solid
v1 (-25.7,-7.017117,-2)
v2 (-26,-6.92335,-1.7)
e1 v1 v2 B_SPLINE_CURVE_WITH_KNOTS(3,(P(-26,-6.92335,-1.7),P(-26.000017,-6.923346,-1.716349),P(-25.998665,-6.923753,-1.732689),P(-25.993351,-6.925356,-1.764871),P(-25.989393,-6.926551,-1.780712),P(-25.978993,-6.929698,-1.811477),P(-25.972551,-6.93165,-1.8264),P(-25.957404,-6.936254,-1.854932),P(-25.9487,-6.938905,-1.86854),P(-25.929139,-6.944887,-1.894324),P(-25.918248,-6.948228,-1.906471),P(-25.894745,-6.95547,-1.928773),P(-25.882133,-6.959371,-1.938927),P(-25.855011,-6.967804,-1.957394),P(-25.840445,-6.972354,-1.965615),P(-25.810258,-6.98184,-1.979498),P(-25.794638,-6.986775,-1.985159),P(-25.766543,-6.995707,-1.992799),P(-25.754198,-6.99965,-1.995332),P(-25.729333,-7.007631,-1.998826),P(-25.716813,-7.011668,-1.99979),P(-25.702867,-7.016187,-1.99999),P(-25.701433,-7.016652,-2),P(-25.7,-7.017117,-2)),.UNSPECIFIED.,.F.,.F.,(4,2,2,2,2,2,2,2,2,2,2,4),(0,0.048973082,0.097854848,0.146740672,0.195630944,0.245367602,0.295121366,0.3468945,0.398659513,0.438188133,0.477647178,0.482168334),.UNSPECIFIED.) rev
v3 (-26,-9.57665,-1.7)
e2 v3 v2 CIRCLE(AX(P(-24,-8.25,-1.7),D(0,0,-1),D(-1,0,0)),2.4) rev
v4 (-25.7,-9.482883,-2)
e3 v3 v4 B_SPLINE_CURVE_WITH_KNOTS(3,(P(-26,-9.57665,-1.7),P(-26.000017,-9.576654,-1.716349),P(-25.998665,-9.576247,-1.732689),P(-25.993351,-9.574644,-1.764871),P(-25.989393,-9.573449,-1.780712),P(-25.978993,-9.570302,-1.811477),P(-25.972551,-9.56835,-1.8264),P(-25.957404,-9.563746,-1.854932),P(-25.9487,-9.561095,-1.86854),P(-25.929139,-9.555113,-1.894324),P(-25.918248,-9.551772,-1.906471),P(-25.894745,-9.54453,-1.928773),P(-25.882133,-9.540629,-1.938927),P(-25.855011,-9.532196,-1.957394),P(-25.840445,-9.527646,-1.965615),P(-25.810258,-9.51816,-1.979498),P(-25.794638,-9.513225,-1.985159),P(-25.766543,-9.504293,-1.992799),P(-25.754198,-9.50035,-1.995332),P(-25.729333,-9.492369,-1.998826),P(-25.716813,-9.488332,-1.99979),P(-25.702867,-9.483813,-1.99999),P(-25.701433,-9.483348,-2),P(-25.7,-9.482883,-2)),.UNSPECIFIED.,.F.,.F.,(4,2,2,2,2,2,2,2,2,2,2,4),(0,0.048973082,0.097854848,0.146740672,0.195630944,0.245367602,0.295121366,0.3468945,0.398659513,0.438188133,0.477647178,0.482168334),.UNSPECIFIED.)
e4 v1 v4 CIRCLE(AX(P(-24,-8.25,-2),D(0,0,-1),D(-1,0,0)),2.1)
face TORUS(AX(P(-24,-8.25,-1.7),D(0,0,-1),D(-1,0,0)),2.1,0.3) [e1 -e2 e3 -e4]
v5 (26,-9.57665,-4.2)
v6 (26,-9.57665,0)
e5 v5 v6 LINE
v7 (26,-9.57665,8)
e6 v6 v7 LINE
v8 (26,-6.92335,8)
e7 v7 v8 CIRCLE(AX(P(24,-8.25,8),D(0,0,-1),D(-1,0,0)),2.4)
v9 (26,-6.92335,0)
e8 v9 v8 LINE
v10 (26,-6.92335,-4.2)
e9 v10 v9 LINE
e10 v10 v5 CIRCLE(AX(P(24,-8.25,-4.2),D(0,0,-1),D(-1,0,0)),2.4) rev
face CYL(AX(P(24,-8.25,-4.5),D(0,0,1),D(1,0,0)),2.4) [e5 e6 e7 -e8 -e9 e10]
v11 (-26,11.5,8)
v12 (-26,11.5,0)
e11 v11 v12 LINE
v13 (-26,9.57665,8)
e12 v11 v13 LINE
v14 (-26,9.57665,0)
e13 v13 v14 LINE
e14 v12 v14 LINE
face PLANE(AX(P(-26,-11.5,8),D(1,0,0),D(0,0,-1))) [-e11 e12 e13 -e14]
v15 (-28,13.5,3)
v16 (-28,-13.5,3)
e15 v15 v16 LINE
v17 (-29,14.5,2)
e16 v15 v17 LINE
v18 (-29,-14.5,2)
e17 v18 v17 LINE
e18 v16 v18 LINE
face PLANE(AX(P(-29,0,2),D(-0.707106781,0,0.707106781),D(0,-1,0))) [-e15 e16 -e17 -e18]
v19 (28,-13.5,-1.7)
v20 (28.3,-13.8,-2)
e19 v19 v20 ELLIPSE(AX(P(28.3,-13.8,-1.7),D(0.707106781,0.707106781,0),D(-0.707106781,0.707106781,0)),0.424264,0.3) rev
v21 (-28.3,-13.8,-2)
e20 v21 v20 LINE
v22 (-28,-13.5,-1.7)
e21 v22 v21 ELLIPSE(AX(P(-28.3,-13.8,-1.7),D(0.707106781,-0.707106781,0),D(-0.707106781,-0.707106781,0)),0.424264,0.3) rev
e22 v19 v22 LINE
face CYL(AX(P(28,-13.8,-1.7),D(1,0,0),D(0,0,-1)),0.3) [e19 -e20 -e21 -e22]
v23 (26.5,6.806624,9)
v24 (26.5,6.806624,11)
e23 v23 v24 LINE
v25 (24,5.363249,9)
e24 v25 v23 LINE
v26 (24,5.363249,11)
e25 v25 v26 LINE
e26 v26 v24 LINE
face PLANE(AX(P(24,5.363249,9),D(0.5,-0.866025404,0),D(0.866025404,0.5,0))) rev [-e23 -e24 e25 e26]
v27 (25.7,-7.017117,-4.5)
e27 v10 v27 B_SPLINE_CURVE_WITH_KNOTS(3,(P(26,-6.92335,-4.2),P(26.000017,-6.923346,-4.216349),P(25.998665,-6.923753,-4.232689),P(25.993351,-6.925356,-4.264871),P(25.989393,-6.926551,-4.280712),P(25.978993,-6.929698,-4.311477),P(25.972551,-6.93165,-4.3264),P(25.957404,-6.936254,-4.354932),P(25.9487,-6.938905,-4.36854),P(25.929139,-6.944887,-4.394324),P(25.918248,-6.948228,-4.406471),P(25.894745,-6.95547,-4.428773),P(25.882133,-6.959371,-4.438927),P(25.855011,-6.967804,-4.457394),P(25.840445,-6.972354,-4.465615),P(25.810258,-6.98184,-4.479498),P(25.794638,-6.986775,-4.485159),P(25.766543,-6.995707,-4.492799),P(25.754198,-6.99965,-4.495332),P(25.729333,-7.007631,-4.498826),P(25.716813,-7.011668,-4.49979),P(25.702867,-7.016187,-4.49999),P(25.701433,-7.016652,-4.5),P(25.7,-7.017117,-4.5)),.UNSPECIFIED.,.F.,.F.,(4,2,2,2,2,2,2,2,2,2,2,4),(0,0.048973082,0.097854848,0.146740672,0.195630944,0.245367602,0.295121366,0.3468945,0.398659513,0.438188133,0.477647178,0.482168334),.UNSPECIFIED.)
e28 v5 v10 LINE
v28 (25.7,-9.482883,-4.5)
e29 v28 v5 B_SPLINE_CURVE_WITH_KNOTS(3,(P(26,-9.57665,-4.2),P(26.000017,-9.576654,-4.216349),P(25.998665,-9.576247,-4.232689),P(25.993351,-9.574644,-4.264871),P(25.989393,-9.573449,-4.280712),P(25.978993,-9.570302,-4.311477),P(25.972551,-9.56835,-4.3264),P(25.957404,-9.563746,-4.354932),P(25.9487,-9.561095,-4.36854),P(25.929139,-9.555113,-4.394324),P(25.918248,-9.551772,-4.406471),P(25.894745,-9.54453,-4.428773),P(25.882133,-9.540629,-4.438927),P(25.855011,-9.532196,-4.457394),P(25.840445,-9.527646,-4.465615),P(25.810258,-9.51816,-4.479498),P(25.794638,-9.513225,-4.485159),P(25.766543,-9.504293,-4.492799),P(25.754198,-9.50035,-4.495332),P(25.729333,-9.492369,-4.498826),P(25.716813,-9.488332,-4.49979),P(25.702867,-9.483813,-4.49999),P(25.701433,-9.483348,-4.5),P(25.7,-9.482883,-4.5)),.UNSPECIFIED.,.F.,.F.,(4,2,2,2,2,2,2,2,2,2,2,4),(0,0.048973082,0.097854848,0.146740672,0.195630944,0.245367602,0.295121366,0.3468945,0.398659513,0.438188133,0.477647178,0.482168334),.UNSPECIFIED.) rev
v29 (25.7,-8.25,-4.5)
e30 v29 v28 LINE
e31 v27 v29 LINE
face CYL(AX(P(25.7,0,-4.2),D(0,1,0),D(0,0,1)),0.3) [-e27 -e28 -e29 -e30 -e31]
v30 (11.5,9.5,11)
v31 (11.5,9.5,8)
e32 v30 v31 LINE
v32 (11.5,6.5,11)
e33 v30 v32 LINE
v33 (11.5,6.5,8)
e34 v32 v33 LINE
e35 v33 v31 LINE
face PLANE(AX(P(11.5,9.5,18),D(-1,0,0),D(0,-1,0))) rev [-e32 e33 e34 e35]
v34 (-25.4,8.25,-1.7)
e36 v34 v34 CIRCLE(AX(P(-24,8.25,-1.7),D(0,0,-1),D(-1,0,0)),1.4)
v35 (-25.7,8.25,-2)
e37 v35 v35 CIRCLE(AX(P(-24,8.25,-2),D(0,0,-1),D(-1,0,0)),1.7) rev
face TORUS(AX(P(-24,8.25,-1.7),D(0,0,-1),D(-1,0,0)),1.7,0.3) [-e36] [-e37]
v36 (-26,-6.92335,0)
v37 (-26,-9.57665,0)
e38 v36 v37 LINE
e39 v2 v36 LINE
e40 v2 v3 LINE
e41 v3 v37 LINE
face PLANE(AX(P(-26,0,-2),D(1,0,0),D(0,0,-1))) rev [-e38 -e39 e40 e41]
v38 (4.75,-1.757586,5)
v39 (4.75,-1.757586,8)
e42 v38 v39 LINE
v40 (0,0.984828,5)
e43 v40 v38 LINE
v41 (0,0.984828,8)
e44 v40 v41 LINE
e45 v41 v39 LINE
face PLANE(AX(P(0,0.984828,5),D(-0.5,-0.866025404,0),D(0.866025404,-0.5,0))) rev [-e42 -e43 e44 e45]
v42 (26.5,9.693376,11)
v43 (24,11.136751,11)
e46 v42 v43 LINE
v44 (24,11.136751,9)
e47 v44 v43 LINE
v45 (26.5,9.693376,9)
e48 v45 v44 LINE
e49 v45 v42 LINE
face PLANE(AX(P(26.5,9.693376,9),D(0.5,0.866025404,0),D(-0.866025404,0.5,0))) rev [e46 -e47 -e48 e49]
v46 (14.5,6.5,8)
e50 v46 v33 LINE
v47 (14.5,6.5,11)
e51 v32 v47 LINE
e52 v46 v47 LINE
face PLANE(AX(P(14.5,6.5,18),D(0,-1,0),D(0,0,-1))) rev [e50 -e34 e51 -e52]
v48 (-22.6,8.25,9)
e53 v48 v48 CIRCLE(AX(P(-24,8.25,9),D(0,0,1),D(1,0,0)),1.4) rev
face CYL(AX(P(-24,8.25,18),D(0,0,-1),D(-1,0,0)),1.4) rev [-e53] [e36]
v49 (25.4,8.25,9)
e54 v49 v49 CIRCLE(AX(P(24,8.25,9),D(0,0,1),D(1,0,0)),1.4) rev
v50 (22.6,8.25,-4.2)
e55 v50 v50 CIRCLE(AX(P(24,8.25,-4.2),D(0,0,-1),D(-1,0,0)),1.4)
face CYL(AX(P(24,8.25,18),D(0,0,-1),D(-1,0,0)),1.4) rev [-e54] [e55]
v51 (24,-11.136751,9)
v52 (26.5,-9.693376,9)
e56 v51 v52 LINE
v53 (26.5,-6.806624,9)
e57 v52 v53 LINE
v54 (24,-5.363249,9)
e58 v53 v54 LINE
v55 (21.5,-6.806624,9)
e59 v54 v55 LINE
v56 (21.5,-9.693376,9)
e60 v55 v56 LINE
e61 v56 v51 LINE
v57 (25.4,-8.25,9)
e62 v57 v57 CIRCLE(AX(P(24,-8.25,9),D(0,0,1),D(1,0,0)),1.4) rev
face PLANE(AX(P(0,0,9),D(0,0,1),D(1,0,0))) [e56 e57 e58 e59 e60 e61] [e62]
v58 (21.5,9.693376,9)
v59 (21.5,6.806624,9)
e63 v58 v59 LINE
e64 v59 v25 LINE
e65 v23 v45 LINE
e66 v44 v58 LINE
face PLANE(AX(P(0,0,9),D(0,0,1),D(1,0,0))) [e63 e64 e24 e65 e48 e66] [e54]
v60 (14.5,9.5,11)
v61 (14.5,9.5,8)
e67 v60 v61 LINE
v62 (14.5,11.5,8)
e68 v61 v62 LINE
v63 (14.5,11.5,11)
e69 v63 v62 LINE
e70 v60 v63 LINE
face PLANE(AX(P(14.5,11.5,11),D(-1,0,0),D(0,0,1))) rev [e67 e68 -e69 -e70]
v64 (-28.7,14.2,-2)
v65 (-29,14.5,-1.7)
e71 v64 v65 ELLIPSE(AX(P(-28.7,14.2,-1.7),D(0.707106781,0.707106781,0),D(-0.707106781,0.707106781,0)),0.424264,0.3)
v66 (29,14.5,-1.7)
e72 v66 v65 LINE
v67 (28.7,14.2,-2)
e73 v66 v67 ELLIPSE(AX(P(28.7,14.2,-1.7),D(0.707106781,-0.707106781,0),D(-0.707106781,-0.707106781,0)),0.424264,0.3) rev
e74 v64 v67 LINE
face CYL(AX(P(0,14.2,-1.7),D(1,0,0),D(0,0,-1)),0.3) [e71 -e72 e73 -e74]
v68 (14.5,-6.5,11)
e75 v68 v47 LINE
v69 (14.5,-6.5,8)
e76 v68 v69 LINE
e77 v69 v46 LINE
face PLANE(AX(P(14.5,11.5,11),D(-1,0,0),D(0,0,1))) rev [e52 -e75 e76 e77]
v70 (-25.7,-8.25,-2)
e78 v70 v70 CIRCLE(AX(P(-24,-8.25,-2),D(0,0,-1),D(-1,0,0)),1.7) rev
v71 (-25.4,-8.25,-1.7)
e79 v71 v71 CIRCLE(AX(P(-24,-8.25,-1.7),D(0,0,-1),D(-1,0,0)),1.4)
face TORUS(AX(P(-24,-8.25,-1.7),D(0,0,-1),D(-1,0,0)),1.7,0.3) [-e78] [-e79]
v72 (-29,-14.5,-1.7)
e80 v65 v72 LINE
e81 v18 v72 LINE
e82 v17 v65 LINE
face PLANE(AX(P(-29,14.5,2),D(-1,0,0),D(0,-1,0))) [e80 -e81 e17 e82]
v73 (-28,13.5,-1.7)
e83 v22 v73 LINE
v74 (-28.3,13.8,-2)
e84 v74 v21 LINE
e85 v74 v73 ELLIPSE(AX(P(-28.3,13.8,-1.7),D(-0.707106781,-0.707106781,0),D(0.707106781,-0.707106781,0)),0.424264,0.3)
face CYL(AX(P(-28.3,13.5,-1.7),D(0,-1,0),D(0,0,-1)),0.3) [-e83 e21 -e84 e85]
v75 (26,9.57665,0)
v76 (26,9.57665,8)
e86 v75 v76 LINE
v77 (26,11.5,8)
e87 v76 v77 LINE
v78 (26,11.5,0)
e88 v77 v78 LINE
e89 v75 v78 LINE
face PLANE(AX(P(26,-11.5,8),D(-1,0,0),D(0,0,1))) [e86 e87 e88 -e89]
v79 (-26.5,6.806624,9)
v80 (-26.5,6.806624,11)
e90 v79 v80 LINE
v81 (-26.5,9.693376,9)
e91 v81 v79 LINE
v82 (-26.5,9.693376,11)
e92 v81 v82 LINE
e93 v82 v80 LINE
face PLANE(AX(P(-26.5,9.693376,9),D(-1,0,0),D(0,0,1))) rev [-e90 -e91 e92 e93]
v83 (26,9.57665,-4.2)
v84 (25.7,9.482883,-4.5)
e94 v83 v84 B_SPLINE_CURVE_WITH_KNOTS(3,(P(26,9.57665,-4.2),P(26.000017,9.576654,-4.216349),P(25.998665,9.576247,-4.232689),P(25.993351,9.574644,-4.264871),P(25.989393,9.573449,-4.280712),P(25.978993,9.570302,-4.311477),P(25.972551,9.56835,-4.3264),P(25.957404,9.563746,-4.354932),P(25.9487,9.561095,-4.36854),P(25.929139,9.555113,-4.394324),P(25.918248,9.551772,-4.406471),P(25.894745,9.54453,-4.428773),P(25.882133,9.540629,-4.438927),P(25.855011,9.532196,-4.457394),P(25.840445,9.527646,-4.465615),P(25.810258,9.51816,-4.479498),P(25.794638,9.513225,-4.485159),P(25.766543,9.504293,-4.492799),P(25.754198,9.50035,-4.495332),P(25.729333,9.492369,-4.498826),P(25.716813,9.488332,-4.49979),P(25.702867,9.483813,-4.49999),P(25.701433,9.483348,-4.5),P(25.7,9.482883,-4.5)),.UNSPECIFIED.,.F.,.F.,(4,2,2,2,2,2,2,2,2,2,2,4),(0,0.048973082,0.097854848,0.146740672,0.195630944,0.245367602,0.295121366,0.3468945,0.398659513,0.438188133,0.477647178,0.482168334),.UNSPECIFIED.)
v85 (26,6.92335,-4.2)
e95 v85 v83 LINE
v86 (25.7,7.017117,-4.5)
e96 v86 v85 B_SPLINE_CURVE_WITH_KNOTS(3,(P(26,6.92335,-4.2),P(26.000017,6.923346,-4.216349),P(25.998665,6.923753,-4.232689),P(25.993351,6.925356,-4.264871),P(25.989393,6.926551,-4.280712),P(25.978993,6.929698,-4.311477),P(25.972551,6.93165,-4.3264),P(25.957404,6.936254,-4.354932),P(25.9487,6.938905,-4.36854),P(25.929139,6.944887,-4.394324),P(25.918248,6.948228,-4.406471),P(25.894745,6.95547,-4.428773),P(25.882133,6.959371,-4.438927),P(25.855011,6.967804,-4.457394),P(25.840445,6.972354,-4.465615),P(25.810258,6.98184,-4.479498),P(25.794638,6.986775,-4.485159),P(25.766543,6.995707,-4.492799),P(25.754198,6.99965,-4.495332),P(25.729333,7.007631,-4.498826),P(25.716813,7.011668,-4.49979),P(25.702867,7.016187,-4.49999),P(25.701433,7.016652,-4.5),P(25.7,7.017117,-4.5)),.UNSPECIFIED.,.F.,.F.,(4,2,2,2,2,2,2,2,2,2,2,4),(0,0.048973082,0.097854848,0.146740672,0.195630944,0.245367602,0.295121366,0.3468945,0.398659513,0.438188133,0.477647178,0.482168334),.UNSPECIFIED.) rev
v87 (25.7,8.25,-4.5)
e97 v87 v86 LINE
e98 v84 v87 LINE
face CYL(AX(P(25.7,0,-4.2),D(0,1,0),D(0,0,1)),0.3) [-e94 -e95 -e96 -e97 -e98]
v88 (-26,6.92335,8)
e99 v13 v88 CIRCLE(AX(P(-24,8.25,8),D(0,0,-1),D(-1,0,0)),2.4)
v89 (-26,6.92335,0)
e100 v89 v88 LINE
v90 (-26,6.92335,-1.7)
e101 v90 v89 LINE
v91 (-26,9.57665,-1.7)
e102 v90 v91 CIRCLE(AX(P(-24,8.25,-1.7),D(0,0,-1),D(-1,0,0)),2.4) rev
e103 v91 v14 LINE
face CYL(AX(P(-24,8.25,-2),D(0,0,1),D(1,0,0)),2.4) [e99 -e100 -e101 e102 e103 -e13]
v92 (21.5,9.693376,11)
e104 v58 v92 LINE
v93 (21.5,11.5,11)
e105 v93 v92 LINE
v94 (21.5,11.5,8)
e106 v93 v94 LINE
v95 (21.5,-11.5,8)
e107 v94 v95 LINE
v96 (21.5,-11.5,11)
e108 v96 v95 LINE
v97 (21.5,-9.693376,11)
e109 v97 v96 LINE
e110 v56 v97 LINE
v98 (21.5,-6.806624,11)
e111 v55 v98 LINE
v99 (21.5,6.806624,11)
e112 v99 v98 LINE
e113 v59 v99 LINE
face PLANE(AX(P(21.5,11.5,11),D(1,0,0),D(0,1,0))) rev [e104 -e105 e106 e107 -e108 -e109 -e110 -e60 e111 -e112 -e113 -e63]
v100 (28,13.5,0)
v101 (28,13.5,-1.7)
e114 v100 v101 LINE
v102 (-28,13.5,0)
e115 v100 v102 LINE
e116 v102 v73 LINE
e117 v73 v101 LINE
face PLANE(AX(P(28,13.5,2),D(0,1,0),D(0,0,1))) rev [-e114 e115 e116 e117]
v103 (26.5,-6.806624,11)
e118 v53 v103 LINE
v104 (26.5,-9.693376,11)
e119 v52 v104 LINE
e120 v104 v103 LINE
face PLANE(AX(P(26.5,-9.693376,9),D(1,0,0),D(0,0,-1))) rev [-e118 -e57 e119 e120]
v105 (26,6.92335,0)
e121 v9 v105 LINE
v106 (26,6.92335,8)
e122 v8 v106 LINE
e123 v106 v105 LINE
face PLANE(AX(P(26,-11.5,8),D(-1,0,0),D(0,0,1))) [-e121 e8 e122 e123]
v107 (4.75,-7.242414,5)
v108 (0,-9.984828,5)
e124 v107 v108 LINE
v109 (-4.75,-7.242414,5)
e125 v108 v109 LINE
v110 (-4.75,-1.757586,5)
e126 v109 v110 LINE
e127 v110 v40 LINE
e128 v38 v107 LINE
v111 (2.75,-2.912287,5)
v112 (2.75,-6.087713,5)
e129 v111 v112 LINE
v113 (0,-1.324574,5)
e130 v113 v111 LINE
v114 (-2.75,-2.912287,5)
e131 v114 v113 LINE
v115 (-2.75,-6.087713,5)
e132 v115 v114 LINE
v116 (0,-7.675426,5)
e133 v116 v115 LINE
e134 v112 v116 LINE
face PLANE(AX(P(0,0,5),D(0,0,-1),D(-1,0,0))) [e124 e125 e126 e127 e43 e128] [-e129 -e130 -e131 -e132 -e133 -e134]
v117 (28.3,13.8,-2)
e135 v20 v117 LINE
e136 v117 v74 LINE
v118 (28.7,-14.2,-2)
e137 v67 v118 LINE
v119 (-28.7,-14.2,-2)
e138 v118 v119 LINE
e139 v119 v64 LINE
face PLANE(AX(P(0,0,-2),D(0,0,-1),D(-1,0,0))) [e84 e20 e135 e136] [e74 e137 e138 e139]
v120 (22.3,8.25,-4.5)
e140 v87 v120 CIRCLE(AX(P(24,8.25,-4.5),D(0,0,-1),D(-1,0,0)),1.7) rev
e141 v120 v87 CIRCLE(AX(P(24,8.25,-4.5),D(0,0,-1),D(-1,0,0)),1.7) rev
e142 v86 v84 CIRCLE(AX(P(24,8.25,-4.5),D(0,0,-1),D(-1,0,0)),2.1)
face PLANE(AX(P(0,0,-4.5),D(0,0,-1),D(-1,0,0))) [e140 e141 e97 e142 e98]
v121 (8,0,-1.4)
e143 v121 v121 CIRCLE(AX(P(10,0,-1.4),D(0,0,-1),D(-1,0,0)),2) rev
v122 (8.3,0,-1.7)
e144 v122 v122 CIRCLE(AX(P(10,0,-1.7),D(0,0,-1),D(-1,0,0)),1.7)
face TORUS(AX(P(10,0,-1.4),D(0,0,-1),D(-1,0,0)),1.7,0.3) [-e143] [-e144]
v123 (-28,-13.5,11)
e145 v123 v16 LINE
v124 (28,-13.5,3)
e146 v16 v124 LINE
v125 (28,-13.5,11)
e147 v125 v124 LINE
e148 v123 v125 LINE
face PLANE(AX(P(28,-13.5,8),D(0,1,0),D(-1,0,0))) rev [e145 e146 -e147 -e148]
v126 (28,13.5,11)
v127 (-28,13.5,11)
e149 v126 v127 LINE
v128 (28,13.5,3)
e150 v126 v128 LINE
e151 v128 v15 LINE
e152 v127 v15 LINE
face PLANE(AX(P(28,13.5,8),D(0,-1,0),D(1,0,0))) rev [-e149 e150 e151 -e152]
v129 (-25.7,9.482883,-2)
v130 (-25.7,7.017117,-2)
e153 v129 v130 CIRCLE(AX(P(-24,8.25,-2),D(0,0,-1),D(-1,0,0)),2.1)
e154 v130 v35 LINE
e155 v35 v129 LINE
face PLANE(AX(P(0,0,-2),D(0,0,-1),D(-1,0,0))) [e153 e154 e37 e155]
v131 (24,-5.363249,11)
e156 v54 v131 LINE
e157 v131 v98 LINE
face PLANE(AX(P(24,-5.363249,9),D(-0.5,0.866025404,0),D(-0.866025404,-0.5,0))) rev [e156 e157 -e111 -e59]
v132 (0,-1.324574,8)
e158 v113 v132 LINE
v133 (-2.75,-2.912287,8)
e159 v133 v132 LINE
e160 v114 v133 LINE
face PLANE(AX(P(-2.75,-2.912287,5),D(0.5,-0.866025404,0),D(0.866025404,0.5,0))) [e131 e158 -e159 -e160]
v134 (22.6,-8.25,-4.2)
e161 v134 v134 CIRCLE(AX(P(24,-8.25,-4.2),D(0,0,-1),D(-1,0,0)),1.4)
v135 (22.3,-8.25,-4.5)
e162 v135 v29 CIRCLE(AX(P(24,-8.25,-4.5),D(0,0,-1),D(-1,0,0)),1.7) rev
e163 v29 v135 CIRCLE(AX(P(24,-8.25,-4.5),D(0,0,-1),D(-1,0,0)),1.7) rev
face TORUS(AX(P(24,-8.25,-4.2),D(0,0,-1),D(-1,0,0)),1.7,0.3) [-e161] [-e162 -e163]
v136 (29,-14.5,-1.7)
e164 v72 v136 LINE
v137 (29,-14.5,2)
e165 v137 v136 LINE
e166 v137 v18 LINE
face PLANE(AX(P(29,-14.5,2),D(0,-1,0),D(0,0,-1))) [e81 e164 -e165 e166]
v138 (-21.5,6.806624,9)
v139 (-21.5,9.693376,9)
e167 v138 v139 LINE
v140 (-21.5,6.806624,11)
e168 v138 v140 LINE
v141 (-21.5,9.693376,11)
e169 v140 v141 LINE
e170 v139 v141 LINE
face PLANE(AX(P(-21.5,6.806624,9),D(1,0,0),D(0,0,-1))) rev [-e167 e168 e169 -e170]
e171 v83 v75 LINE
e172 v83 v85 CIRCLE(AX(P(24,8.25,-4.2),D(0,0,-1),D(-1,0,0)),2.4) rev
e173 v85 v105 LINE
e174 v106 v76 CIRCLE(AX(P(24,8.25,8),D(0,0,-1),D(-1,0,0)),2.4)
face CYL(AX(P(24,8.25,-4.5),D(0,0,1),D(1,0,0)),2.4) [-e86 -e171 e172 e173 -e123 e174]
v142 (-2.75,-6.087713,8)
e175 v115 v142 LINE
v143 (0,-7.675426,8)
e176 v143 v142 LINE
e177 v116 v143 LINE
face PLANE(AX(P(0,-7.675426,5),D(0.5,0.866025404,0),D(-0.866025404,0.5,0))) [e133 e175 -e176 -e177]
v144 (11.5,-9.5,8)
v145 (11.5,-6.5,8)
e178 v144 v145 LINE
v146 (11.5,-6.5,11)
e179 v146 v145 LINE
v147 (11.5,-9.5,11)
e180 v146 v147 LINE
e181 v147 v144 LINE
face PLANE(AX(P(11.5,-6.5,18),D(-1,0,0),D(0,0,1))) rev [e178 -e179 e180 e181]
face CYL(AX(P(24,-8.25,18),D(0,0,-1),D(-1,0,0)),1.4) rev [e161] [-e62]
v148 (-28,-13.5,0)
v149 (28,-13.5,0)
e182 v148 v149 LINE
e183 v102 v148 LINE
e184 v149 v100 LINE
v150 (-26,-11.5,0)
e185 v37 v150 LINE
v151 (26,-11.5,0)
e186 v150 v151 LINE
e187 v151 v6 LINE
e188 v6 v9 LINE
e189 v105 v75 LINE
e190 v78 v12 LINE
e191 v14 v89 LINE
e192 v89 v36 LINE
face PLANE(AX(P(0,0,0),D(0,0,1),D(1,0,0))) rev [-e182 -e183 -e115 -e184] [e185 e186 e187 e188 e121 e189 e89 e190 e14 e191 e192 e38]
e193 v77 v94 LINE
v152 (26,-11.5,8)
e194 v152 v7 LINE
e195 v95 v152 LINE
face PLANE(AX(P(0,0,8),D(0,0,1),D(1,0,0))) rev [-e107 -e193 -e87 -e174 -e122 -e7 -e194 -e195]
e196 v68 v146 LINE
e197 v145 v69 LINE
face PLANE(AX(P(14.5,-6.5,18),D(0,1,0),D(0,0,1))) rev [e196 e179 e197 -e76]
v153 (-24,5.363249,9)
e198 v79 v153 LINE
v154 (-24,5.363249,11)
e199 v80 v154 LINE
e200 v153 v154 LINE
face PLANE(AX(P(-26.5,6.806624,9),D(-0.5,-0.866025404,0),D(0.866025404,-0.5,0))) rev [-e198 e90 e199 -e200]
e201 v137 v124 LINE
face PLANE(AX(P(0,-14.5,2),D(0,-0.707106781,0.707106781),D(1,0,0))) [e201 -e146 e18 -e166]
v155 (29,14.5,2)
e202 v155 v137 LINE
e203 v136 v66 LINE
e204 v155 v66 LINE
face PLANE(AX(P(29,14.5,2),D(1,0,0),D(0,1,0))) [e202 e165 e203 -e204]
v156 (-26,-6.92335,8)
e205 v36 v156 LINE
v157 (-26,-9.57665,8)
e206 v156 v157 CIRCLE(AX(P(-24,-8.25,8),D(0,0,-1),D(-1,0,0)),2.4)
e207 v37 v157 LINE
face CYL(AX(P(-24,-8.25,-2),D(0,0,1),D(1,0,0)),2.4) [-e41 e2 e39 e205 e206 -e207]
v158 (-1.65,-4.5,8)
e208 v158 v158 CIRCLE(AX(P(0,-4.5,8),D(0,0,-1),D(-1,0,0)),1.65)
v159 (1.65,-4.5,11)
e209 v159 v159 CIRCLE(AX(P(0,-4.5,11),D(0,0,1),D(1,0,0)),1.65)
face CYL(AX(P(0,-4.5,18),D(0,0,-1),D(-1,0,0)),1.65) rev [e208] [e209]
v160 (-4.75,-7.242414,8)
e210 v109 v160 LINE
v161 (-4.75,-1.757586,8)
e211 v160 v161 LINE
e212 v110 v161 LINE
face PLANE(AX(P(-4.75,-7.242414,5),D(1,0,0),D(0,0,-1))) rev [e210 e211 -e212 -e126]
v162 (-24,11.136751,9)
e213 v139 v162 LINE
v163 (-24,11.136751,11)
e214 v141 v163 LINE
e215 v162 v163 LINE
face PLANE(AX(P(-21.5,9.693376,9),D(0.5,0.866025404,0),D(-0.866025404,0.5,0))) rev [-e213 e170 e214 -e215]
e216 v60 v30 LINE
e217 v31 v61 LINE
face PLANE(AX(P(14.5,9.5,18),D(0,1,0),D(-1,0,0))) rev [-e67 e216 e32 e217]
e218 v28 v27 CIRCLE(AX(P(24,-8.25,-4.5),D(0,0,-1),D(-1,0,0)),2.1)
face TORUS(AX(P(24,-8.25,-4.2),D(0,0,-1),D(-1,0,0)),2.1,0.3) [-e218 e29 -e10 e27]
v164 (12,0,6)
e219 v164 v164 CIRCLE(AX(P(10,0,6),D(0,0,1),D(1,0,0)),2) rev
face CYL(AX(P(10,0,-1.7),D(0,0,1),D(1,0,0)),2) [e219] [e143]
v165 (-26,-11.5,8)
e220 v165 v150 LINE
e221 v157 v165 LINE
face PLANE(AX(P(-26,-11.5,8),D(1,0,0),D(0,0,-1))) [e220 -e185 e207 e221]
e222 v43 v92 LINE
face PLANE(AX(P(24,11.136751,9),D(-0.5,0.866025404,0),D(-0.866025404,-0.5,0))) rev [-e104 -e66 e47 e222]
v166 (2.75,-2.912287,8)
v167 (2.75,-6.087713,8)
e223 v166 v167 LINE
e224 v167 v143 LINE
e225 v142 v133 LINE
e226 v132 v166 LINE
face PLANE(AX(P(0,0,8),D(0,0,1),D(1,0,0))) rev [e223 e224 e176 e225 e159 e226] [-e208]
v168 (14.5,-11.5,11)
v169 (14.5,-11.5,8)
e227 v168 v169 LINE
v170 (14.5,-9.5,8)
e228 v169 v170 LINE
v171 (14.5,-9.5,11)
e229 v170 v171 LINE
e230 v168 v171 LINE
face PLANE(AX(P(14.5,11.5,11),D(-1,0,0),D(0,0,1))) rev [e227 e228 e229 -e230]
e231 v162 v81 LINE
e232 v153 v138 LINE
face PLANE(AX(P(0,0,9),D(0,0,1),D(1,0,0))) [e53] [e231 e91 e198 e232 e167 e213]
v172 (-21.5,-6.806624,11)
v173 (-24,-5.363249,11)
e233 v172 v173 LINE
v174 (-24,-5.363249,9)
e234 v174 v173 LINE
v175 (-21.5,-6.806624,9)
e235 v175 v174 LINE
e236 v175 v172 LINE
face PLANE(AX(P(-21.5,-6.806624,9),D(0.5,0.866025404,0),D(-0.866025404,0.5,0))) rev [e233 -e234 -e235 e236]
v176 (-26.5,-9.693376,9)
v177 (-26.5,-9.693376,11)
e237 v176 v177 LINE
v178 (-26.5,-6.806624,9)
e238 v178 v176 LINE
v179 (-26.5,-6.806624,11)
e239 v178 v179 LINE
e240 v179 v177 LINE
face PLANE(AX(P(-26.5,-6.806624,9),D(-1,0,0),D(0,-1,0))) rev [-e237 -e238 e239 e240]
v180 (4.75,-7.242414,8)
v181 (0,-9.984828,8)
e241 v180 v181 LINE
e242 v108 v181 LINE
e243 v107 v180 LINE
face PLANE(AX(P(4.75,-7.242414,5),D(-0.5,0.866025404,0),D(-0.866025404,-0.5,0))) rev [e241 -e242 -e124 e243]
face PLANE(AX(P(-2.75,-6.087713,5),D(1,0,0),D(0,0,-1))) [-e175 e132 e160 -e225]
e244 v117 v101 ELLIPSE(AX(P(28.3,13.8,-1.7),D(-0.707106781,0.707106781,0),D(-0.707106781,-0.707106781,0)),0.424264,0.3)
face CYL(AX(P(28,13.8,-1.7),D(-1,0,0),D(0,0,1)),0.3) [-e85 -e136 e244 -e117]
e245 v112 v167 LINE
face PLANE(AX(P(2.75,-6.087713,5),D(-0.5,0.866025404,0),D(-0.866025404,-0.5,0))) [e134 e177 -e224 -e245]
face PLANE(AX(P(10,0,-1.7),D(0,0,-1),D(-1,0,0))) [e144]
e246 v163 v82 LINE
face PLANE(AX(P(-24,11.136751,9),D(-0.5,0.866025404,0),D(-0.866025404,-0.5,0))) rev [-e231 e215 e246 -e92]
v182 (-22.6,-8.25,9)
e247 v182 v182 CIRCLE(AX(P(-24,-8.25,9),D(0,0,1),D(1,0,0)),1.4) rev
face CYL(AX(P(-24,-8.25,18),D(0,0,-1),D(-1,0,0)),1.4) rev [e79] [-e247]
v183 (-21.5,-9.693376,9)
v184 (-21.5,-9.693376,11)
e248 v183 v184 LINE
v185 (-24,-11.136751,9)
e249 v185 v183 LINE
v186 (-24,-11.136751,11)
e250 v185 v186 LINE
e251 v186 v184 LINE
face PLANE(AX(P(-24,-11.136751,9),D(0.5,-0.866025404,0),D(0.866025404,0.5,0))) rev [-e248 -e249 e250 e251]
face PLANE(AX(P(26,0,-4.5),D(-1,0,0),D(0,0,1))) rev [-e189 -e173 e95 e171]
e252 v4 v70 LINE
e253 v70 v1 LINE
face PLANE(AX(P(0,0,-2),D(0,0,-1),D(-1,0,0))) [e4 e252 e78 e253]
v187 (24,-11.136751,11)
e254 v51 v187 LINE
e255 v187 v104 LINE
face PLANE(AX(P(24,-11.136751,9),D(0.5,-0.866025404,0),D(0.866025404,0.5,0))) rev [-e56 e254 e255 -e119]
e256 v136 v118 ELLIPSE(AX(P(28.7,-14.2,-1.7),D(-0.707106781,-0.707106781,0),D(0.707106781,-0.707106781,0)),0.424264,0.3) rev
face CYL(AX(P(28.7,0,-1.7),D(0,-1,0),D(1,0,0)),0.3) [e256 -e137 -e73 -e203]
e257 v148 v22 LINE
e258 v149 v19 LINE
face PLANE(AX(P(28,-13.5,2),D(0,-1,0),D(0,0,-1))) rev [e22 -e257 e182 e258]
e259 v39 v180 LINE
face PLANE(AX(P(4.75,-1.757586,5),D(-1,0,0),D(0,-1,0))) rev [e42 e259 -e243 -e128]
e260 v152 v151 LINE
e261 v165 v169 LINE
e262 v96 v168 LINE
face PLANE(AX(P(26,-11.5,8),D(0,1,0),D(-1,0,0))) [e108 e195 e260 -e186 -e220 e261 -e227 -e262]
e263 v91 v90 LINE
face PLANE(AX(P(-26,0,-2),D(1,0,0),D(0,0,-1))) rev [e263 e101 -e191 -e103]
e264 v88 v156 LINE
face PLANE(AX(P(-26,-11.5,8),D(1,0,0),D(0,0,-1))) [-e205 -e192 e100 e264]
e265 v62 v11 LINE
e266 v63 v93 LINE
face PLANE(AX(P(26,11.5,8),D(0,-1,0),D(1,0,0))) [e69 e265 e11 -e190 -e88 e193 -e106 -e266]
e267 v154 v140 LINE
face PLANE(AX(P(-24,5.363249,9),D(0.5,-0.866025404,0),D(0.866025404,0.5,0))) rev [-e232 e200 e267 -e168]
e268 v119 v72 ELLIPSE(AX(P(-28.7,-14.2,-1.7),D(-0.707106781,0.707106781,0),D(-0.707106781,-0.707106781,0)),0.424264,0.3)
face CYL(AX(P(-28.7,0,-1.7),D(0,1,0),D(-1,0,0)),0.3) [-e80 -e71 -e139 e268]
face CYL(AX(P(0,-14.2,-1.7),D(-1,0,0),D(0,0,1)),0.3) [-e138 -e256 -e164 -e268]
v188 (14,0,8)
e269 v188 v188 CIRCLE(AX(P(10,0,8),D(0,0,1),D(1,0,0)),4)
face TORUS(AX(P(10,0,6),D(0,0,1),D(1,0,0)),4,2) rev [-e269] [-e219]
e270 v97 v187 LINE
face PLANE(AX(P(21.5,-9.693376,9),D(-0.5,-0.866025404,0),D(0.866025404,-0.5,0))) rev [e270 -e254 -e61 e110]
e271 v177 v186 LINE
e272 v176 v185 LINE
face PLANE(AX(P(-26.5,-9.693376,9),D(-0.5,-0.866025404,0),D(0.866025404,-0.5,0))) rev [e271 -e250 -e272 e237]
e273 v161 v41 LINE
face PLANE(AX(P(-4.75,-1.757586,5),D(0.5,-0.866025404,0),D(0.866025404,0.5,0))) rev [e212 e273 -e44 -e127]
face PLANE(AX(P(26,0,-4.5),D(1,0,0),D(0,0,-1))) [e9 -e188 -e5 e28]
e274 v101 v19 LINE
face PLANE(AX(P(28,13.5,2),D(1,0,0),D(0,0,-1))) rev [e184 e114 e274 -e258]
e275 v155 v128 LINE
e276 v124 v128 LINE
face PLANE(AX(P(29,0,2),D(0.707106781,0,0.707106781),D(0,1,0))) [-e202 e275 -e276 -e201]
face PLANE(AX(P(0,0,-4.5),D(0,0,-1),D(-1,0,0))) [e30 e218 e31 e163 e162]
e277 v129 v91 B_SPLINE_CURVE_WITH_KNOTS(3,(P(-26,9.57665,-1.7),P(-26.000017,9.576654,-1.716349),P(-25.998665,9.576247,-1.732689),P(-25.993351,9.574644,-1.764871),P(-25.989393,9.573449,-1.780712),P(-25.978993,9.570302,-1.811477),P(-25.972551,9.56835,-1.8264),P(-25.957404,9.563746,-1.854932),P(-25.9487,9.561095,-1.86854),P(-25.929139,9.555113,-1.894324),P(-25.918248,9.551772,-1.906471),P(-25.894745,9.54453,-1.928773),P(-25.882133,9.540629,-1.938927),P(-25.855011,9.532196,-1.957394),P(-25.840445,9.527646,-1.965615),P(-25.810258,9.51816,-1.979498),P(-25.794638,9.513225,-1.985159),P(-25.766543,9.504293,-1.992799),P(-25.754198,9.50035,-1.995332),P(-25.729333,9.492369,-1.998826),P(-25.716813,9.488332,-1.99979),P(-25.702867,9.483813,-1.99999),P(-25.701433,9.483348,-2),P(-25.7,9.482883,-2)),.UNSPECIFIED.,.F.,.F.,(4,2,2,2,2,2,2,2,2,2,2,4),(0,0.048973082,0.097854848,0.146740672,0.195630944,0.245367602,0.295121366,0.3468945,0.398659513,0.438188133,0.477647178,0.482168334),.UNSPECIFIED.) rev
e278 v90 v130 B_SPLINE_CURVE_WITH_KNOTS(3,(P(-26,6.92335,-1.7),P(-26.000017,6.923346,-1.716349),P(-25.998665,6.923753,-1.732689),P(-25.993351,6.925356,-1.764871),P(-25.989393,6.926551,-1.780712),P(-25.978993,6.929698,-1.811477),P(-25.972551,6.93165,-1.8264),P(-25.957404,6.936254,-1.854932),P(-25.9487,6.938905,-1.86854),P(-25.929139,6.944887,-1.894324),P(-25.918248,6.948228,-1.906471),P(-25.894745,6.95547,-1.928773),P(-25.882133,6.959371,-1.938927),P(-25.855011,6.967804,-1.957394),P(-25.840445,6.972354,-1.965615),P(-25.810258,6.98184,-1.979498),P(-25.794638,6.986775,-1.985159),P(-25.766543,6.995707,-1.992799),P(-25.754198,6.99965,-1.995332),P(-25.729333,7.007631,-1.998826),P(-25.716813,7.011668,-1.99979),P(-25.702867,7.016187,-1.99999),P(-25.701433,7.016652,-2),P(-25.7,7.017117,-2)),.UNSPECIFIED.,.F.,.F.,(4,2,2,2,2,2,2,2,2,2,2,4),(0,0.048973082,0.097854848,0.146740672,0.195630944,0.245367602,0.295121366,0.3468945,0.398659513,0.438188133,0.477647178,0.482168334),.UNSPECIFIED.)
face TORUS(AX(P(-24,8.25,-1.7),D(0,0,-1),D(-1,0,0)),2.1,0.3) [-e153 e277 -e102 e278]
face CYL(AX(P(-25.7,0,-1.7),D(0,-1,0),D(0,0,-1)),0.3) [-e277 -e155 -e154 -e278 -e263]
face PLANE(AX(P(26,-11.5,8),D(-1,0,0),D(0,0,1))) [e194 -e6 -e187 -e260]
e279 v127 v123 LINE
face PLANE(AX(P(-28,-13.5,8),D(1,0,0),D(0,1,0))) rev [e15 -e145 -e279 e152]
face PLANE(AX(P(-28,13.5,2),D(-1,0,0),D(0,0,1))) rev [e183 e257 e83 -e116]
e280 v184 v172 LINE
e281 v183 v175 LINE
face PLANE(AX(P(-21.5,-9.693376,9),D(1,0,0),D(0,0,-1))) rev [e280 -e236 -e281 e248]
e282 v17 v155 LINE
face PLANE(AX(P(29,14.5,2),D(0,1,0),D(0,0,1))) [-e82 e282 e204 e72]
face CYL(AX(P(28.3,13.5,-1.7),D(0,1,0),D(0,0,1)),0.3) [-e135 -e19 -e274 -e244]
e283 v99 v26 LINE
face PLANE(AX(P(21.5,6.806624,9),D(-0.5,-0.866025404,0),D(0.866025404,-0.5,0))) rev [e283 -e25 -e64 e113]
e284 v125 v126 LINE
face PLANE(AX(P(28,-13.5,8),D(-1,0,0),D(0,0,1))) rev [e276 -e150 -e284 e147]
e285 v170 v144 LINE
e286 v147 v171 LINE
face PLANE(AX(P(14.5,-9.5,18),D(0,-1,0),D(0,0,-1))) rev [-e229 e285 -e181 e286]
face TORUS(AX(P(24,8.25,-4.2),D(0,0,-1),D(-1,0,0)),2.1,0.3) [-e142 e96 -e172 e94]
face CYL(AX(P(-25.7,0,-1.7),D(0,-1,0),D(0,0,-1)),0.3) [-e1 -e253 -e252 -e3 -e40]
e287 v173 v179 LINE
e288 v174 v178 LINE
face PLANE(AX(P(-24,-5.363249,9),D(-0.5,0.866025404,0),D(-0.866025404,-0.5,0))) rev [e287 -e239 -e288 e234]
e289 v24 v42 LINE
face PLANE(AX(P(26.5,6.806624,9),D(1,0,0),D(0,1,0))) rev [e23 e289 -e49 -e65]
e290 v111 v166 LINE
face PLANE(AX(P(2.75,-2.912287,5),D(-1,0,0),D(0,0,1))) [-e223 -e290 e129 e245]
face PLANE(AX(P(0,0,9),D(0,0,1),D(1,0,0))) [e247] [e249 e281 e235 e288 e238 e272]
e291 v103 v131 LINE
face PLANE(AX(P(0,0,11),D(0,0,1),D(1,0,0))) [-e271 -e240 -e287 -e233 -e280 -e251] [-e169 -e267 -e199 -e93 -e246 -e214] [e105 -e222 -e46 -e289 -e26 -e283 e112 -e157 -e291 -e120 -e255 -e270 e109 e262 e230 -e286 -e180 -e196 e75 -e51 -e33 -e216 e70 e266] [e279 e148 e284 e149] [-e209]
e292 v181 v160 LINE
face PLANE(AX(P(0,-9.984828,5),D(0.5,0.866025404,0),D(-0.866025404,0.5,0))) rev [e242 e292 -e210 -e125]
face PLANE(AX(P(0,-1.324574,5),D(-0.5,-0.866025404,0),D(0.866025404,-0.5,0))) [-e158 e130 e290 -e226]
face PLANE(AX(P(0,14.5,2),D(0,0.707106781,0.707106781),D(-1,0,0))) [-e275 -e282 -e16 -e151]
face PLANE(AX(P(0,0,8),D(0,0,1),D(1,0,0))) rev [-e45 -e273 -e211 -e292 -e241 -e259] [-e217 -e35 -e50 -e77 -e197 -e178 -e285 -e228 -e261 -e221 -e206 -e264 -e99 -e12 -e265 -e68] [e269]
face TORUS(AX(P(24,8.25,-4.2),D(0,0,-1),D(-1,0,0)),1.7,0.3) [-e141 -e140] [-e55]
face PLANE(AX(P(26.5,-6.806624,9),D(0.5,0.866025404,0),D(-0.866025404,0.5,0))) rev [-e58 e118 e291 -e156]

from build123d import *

# Parameters (mm, degrees)
BOSS_EXTRUDE1_DEPTH      = 8
SKETCH2_W                = 55.999999999999986
SKETCH2_H                = 27.00000000000001
BOSS_EXTRUDE2_DEPTH      = 3
CUT_EXTRUDE1_DEPTH       = 3
SKETCH5_R                = 1.9999999999999996
BOSS_EXTRUDE3_DEPTH      = 9.7
FILLET1_R                = 2
SKETCH6_R                = 1.3999999999999992
CUT_EXTRUDE2_DEPTH       = 10
CUT_EXTRUDE3_DEPTH       = 2
SKETCH11_R               = 1.6500000000000004
SKETCH11_W               = 3
SKETCH11_H               = 2.9999999999999973
CUT_EXTRUDE4_DEPTH       = 10
BOSS_EXTRUDE5_START      = 10
SKETCH10_R               = 1.3999999999999992
BOSS_EXTRUDE5_DEPTH      = 10
BOSS_EXTRUDE6_START      = 12.5
SKETCH10_5_R             = 1.3999999999999992
BOSS_EXTRUDE6_DEPTH      = 12.5
BOSS_EXTRUDE7_DEPTH      = 2
BOSS_EXTRUDE7_DEPTH_BACK = 2
SKETCH12_W               = 55.999999999999986
SKETCH12_H               = 27.000000000000014
BOSS_EXTRUDE8_DEPTH      = 3
FILLET2_R                = 0.3
FILLET3_R                = 0.3
CHAMFER1_SIZE            = 1


with BuildPart() as part:
    # Sketch1 → Boss-Extrude1 (new body)
    with BuildSketch(Plane.XY):
        Polygon((27.999999999999982, -13.499999999999995), (-28.000000000000004, -13.500000000000002), (-27.999999999999996, 13.500000000000005), (27.999999999999982, 13.500000000000012), align=None)
        Polygon((25.999999999999996, -11.499999999999993), (-26.000000000000004, -11.500000000000002), (-26.000000000000004, 11.499999999999998), (25.999999999999996, 11.500000000000005), align=None, mode=Mode.SUBTRACT)
    extrude(amount=BOSS_EXTRUDE1_DEPTH)

    # Sketch2 → Boss-Extrude2 (add)
    with BuildSketch(Plane.XY.offset(8)):
        Rectangle(SKETCH2_W, SKETCH2_H)
    extrude(amount=BOSS_EXTRUDE2_DEPTH)

    # Sketch4 → Cut-Extrude1 (cut)
    with BuildSketch(Plane(origin=(0, 0, 8), x_dir=(-1, 0, 0), z_dir=(0, 0, -1))):
        Polygon((-21.499999999999993, 11.500000000000005), (-14.499999999999993, 11.500000000000005), (-14.499999999999993, -11.500000000000002), (-21.49999999999999, -11.500000000000002), align=None)
    extrude(amount=-CUT_EXTRUDE1_DEPTH, mode=Mode.SUBTRACT)

    # Sketch5 → Boss-Extrude3 (add)
    with BuildSketch(Plane(origin=(0, 0, 8), x_dir=(-1, 0, 0), z_dir=(0, 0, -1))):
        with Locations(Location((-10, 0, 0), (0, 0, 180))):
            Circle(SKETCH5_R)
    extrude(amount=BOSS_EXTRUDE3_DEPTH)

    # Fillet1
    fillet1_edges = [part.edges().sort_by_distance(p)[0] for p in [
        (8, -4.9e-16, 8),
    ]]
    fillet(fillet1_edges, radius=FILLET1_R)

    # Sketch6 → Cut-Extrude2 (cut)
    with BuildSketch(Plane(origin=(0, 0, 8), x_dir=(-1, 0, 0), z_dir=(0, 0, -1))):
        with Locations((24, 8.25)):
            Circle(SKETCH6_R)
        with Locations((24, -8.25)):
            Circle(SKETCH6_R)
        with Locations((-23.999999999999986, 8.25)):
            Circle(SKETCH6_R)
        with Locations((-23.999999999999986, -8.25)):
            Circle(SKETCH6_R)
    extrude(amount=-CUT_EXTRUDE2_DEPTH, mode=Mode.SUBTRACT)

    # Sketch8 → Cut-Extrude3 (cut)
    with BuildSketch(Plane.XY.offset(11)):
        Polygon((-26.5, 9.693375672974062), (-26.5, 6.806624327025934), (-24.000000000000004, 5.363248654051871), (-21.500000000000004, 6.806624327025935), (-21.500000000000004, 9.693375672974065), (-23.999999999999996, 11.136751345948126), align=None)
        Polygon((-24, -5.363248654051871), (-26.500000000000004, -6.806624327025933), (-26.5, -9.693375672974067), (-24.000000000000007, -11.136751345948127), (-21.5, -9.693375672974062), (-21.5, -6.806624327025935), align=None)
        Polygon((23.999999999999982, 11.136751345948133), (21.49999999999998, 9.693375672974065), (21.49999999999998, 6.8066243270259355), (23.999999999999982, 5.363248654051871), (26.49999999999999, 6.806624327025936), (26.499999999999986, 9.693375672974069), align=None)
        Polygon((23.999999999999986, -5.363248654051867), (21.499999999999982, -6.806624327025933), (21.499999999999986, -9.693375672974069), (23.999999999999982, -11.136751345948134), (26.49999999999999, -9.693375672974067), (26.49999999999999, -6.806624327025933), align=None)
    extrude(amount=-CUT_EXTRUDE3_DEPTH, mode=Mode.SUBTRACT)

    # Sketch11 → Cut-Extrude4 (cut)
    with BuildSketch(Plane(origin=(0, 0, 8), x_dir=(-1, 0, 0), z_dir=(0, 0, -1))):
        with Locations((0, -4.500000000000003)):
            Circle(SKETCH11_R)
        Polygon((-14.499999999999995, 9.500000000000004), (-11.5, 9.500000000000005), (-11.499999999999996, 6.500000000000007), (-14.499999999999995, 6.500000000000007), align=None)
        with Locations((-12.999999999999996, -8.000000000000004)):
            Rectangle(SKETCH11_W, SKETCH11_H)
    extrude(amount=-CUT_EXTRUDE4_DEPTH, mode=Mode.SUBTRACT)

    # Sketch10 → Boss-Extrude5 (add)
    # profile 1 of 2: a face of its own
    with BuildSketch(Plane(origin=(0, 0, 8), x_dir=(-1, 0, 0), z_dir=(0, 0, -1)).offset(BOSS_EXTRUDE5_START)):
        with BuildLine():
            Line((26.000000000000004, 6.923350083857869), (26.000000000000004, 9.576649916142129))
            ThreePointArc((26.000000000000018, 9.576649916142133), (21.599999999999998, 8.25), (26.000000000000018, 6.923350083857866))
        make_face()
        with Locations((24, 8.25)):
            Circle(SKETCH10_R, mode=Mode.SUBTRACT)
    # profile 2 of 2: a face of its own
    with BuildSketch(Plane(origin=(0, 0, 8), x_dir=(-1, 0, 0), z_dir=(0, 0, -1)).offset(BOSS_EXTRUDE5_START)):
        with BuildLine():
            ThreePointArc((26.000000000000018, -6.923350083857867), (21.599999999999998, -8.249999999999998), (26.000000000000018, -9.576649916142136))
            Line((26.000000000000004, -9.57664991614213), (26.000000000000004, -6.92335008385787))
        make_face()
        with Locations((24, -8.25)):
            Circle(SKETCH10_R, mode=Mode.SUBTRACT)
    extrude(amount=-BOSS_EXTRUDE5_DEPTH)

    # Sketch10<5> → Boss-Extrude6 (add)
    # profile 1 of 2: a face of its own
    with BuildSketch(Plane(origin=(0, 0, 8), x_dir=(-1, 0, 0), z_dir=(0, 0, -1)).offset(BOSS_EXTRUDE6_START)):
        with BuildLine():
            ThreePointArc((-21.599999999999984, 8.25), (-23.307179676972474, 10.547825058615224), (-26.000000000000032, 9.57664991614209))
            Line((-25.999999999999996, 9.57664991614208), (-25.999999999999996, 6.923350083857921))
            ThreePointArc((-26.000000000000036, 6.923350083857913), (-23.307179676972478, 5.952174941384775), (-21.599999999999984, 8.25))
        make_face()
        with Locations((-23.999999999999986, 8.25)):
            Circle(SKETCH10_5_R, mode=Mode.SUBTRACT)
    # profile 2 of 2: a face of its own
    with BuildSketch(Plane(origin=(0, 0, 8), x_dir=(-1, 0, 0), z_dir=(0, 0, -1)).offset(BOSS_EXTRUDE6_START)):
        with BuildLine():
            Line((-25.999999999999996, -6.923350083857921), (-25.999999999999996, -9.57664991614208))
            ThreePointArc((-26.000000000000036, -9.576649916142088), (-23.307179676972478, -10.547825058615224), (-21.599999999999984, -8.25))
            ThreePointArc((-21.599999999999984, -8.25), (-23.307179676972474, -5.952174941384776), (-26.000000000000032, -6.92335008385791))
        make_face()
        with Locations((-23.999999999999986, -8.25)):
            Circle(SKETCH10_5_R, mode=Mode.SUBTRACT)
    extrude(amount=-BOSS_EXTRUDE6_DEPTH)

    # Sketch12 → Boss-Extrude7 (add, two sides: drawn at the far end of the back side and taken through both)
    with BuildSketch(Plane(origin=(0, 0, 0), x_dir=(-1, 0, 0), z_dir=(0, 0, -1)).offset(-BOSS_EXTRUDE7_DEPTH_BACK)):
        Polygon((-28.999999999999986, 14.500000000000012), (28.999999999999996, 14.500000000000012), (29.000000000000007, -14.500000000000002), (-28.999999999999982, -14.500000000000002), align=None)
        Rectangle(SKETCH12_W, SKETCH12_H, mode=Mode.SUBTRACT)
    extrude(amount=BOSS_EXTRUDE7_DEPTH + BOSS_EXTRUDE7_DEPTH_BACK)

    # Sketch14 → Boss-Extrude8 (add)
    with BuildSketch(Plane(origin=(0, 0, 8), x_dir=(-1, 0, 0), z_dir=(0, 0, -1))):
        Polygon((1.73e-15, 0.9848275573014404), (-4.749999999999997, -1.7575862213492788), (-4.7499999999999964, -7.242413778650725), (3.8e-16, -9.984827557301447), (4.749999999999999, -7.242413778650725), (4.749999999999999, -1.7575862213492808), align=None)
        Polygon((4.3e-16, -1.324573519457061), (-2.749999999999999, -2.9122867597285307), (-2.749999999999999, -6.087713240271473), (-1.13e-15, -7.675426480542943), (2.749999999999999, -6.087713240271473), (2.749999999999999, -2.912286759728532), align=None, mode=Mode.SUBTRACT)
    extrude(amount=BOSS_EXTRUDE8_DEPTH)

    # Fillet2
    fillet2_edges = [part.edges().sort_by_distance(p)[0] for p in [
        (-1.066e-14, 13.500000000000012, -2),
        (-1.066e-14, -13.500000000000002, -2),
        (27.999999999999982, 5.33e-15, -2),
        (-28.000000000000004, 5.33e-15, -2),
        (28.999999999999986, 5.33e-15, -2),
        (-1.421e-14, -14.500000000000002, -2),
        (-29, 5.33e-15, -2),
        (-7.11e-15, 14.500000000000012, -2),
    ]]
    fillet(fillet2_edges, radius=FILLET2_R)

    # Fillet3
    fillet3_edges = [part.edges().sort_by_distance(p)[0] for p in [
        (-22.6, 8.25, -2),
        (-26.000000000000004, 8.25, -2),
        (-21.599999999999998, 8.250000000000002, -2),
        (-22.6, -8.25, -2),
        (-26.000000000000004, -8.25, -2),
        (-21.599999999999998, -8.250000000000002, -2),
        (25.399999999999984, 8.25, -4.5),
        (25.999999999999996, 8.25, -4.5),
        (21.599999999999984, 8.25, -4.5),
        (25.999999999999996, -8.25, -4.5),
        (25.399999999999984, -8.25, -4.5),
        (21.599999999999984, -8.25, -4.5),
        (8, -4.9e-16, -1.6999999999999993),
    ]]
    fillet(fillet3_edges, radius=FILLET3_R - 0.0001)  # a hair under: the kernel refuses the full size

    # Chamfer1
    chamfer1_edges = [part.edges().sort_by_distance(p)[0] for p in [
        (-1.066e-14, 13.500000000000012, 2),
        (27.999999999999982, 5.33e-15, 2),
        (-1.066e-14, -13.500000000000002, 2),
        (-28.000000000000004, 5.33e-15, 2),
    ]]
    chamfer(chamfer1_edges, length=CHAMFER1_SIZE - 0.0001)  # a hair under: the kernel refuses the full size


solid = part.part
